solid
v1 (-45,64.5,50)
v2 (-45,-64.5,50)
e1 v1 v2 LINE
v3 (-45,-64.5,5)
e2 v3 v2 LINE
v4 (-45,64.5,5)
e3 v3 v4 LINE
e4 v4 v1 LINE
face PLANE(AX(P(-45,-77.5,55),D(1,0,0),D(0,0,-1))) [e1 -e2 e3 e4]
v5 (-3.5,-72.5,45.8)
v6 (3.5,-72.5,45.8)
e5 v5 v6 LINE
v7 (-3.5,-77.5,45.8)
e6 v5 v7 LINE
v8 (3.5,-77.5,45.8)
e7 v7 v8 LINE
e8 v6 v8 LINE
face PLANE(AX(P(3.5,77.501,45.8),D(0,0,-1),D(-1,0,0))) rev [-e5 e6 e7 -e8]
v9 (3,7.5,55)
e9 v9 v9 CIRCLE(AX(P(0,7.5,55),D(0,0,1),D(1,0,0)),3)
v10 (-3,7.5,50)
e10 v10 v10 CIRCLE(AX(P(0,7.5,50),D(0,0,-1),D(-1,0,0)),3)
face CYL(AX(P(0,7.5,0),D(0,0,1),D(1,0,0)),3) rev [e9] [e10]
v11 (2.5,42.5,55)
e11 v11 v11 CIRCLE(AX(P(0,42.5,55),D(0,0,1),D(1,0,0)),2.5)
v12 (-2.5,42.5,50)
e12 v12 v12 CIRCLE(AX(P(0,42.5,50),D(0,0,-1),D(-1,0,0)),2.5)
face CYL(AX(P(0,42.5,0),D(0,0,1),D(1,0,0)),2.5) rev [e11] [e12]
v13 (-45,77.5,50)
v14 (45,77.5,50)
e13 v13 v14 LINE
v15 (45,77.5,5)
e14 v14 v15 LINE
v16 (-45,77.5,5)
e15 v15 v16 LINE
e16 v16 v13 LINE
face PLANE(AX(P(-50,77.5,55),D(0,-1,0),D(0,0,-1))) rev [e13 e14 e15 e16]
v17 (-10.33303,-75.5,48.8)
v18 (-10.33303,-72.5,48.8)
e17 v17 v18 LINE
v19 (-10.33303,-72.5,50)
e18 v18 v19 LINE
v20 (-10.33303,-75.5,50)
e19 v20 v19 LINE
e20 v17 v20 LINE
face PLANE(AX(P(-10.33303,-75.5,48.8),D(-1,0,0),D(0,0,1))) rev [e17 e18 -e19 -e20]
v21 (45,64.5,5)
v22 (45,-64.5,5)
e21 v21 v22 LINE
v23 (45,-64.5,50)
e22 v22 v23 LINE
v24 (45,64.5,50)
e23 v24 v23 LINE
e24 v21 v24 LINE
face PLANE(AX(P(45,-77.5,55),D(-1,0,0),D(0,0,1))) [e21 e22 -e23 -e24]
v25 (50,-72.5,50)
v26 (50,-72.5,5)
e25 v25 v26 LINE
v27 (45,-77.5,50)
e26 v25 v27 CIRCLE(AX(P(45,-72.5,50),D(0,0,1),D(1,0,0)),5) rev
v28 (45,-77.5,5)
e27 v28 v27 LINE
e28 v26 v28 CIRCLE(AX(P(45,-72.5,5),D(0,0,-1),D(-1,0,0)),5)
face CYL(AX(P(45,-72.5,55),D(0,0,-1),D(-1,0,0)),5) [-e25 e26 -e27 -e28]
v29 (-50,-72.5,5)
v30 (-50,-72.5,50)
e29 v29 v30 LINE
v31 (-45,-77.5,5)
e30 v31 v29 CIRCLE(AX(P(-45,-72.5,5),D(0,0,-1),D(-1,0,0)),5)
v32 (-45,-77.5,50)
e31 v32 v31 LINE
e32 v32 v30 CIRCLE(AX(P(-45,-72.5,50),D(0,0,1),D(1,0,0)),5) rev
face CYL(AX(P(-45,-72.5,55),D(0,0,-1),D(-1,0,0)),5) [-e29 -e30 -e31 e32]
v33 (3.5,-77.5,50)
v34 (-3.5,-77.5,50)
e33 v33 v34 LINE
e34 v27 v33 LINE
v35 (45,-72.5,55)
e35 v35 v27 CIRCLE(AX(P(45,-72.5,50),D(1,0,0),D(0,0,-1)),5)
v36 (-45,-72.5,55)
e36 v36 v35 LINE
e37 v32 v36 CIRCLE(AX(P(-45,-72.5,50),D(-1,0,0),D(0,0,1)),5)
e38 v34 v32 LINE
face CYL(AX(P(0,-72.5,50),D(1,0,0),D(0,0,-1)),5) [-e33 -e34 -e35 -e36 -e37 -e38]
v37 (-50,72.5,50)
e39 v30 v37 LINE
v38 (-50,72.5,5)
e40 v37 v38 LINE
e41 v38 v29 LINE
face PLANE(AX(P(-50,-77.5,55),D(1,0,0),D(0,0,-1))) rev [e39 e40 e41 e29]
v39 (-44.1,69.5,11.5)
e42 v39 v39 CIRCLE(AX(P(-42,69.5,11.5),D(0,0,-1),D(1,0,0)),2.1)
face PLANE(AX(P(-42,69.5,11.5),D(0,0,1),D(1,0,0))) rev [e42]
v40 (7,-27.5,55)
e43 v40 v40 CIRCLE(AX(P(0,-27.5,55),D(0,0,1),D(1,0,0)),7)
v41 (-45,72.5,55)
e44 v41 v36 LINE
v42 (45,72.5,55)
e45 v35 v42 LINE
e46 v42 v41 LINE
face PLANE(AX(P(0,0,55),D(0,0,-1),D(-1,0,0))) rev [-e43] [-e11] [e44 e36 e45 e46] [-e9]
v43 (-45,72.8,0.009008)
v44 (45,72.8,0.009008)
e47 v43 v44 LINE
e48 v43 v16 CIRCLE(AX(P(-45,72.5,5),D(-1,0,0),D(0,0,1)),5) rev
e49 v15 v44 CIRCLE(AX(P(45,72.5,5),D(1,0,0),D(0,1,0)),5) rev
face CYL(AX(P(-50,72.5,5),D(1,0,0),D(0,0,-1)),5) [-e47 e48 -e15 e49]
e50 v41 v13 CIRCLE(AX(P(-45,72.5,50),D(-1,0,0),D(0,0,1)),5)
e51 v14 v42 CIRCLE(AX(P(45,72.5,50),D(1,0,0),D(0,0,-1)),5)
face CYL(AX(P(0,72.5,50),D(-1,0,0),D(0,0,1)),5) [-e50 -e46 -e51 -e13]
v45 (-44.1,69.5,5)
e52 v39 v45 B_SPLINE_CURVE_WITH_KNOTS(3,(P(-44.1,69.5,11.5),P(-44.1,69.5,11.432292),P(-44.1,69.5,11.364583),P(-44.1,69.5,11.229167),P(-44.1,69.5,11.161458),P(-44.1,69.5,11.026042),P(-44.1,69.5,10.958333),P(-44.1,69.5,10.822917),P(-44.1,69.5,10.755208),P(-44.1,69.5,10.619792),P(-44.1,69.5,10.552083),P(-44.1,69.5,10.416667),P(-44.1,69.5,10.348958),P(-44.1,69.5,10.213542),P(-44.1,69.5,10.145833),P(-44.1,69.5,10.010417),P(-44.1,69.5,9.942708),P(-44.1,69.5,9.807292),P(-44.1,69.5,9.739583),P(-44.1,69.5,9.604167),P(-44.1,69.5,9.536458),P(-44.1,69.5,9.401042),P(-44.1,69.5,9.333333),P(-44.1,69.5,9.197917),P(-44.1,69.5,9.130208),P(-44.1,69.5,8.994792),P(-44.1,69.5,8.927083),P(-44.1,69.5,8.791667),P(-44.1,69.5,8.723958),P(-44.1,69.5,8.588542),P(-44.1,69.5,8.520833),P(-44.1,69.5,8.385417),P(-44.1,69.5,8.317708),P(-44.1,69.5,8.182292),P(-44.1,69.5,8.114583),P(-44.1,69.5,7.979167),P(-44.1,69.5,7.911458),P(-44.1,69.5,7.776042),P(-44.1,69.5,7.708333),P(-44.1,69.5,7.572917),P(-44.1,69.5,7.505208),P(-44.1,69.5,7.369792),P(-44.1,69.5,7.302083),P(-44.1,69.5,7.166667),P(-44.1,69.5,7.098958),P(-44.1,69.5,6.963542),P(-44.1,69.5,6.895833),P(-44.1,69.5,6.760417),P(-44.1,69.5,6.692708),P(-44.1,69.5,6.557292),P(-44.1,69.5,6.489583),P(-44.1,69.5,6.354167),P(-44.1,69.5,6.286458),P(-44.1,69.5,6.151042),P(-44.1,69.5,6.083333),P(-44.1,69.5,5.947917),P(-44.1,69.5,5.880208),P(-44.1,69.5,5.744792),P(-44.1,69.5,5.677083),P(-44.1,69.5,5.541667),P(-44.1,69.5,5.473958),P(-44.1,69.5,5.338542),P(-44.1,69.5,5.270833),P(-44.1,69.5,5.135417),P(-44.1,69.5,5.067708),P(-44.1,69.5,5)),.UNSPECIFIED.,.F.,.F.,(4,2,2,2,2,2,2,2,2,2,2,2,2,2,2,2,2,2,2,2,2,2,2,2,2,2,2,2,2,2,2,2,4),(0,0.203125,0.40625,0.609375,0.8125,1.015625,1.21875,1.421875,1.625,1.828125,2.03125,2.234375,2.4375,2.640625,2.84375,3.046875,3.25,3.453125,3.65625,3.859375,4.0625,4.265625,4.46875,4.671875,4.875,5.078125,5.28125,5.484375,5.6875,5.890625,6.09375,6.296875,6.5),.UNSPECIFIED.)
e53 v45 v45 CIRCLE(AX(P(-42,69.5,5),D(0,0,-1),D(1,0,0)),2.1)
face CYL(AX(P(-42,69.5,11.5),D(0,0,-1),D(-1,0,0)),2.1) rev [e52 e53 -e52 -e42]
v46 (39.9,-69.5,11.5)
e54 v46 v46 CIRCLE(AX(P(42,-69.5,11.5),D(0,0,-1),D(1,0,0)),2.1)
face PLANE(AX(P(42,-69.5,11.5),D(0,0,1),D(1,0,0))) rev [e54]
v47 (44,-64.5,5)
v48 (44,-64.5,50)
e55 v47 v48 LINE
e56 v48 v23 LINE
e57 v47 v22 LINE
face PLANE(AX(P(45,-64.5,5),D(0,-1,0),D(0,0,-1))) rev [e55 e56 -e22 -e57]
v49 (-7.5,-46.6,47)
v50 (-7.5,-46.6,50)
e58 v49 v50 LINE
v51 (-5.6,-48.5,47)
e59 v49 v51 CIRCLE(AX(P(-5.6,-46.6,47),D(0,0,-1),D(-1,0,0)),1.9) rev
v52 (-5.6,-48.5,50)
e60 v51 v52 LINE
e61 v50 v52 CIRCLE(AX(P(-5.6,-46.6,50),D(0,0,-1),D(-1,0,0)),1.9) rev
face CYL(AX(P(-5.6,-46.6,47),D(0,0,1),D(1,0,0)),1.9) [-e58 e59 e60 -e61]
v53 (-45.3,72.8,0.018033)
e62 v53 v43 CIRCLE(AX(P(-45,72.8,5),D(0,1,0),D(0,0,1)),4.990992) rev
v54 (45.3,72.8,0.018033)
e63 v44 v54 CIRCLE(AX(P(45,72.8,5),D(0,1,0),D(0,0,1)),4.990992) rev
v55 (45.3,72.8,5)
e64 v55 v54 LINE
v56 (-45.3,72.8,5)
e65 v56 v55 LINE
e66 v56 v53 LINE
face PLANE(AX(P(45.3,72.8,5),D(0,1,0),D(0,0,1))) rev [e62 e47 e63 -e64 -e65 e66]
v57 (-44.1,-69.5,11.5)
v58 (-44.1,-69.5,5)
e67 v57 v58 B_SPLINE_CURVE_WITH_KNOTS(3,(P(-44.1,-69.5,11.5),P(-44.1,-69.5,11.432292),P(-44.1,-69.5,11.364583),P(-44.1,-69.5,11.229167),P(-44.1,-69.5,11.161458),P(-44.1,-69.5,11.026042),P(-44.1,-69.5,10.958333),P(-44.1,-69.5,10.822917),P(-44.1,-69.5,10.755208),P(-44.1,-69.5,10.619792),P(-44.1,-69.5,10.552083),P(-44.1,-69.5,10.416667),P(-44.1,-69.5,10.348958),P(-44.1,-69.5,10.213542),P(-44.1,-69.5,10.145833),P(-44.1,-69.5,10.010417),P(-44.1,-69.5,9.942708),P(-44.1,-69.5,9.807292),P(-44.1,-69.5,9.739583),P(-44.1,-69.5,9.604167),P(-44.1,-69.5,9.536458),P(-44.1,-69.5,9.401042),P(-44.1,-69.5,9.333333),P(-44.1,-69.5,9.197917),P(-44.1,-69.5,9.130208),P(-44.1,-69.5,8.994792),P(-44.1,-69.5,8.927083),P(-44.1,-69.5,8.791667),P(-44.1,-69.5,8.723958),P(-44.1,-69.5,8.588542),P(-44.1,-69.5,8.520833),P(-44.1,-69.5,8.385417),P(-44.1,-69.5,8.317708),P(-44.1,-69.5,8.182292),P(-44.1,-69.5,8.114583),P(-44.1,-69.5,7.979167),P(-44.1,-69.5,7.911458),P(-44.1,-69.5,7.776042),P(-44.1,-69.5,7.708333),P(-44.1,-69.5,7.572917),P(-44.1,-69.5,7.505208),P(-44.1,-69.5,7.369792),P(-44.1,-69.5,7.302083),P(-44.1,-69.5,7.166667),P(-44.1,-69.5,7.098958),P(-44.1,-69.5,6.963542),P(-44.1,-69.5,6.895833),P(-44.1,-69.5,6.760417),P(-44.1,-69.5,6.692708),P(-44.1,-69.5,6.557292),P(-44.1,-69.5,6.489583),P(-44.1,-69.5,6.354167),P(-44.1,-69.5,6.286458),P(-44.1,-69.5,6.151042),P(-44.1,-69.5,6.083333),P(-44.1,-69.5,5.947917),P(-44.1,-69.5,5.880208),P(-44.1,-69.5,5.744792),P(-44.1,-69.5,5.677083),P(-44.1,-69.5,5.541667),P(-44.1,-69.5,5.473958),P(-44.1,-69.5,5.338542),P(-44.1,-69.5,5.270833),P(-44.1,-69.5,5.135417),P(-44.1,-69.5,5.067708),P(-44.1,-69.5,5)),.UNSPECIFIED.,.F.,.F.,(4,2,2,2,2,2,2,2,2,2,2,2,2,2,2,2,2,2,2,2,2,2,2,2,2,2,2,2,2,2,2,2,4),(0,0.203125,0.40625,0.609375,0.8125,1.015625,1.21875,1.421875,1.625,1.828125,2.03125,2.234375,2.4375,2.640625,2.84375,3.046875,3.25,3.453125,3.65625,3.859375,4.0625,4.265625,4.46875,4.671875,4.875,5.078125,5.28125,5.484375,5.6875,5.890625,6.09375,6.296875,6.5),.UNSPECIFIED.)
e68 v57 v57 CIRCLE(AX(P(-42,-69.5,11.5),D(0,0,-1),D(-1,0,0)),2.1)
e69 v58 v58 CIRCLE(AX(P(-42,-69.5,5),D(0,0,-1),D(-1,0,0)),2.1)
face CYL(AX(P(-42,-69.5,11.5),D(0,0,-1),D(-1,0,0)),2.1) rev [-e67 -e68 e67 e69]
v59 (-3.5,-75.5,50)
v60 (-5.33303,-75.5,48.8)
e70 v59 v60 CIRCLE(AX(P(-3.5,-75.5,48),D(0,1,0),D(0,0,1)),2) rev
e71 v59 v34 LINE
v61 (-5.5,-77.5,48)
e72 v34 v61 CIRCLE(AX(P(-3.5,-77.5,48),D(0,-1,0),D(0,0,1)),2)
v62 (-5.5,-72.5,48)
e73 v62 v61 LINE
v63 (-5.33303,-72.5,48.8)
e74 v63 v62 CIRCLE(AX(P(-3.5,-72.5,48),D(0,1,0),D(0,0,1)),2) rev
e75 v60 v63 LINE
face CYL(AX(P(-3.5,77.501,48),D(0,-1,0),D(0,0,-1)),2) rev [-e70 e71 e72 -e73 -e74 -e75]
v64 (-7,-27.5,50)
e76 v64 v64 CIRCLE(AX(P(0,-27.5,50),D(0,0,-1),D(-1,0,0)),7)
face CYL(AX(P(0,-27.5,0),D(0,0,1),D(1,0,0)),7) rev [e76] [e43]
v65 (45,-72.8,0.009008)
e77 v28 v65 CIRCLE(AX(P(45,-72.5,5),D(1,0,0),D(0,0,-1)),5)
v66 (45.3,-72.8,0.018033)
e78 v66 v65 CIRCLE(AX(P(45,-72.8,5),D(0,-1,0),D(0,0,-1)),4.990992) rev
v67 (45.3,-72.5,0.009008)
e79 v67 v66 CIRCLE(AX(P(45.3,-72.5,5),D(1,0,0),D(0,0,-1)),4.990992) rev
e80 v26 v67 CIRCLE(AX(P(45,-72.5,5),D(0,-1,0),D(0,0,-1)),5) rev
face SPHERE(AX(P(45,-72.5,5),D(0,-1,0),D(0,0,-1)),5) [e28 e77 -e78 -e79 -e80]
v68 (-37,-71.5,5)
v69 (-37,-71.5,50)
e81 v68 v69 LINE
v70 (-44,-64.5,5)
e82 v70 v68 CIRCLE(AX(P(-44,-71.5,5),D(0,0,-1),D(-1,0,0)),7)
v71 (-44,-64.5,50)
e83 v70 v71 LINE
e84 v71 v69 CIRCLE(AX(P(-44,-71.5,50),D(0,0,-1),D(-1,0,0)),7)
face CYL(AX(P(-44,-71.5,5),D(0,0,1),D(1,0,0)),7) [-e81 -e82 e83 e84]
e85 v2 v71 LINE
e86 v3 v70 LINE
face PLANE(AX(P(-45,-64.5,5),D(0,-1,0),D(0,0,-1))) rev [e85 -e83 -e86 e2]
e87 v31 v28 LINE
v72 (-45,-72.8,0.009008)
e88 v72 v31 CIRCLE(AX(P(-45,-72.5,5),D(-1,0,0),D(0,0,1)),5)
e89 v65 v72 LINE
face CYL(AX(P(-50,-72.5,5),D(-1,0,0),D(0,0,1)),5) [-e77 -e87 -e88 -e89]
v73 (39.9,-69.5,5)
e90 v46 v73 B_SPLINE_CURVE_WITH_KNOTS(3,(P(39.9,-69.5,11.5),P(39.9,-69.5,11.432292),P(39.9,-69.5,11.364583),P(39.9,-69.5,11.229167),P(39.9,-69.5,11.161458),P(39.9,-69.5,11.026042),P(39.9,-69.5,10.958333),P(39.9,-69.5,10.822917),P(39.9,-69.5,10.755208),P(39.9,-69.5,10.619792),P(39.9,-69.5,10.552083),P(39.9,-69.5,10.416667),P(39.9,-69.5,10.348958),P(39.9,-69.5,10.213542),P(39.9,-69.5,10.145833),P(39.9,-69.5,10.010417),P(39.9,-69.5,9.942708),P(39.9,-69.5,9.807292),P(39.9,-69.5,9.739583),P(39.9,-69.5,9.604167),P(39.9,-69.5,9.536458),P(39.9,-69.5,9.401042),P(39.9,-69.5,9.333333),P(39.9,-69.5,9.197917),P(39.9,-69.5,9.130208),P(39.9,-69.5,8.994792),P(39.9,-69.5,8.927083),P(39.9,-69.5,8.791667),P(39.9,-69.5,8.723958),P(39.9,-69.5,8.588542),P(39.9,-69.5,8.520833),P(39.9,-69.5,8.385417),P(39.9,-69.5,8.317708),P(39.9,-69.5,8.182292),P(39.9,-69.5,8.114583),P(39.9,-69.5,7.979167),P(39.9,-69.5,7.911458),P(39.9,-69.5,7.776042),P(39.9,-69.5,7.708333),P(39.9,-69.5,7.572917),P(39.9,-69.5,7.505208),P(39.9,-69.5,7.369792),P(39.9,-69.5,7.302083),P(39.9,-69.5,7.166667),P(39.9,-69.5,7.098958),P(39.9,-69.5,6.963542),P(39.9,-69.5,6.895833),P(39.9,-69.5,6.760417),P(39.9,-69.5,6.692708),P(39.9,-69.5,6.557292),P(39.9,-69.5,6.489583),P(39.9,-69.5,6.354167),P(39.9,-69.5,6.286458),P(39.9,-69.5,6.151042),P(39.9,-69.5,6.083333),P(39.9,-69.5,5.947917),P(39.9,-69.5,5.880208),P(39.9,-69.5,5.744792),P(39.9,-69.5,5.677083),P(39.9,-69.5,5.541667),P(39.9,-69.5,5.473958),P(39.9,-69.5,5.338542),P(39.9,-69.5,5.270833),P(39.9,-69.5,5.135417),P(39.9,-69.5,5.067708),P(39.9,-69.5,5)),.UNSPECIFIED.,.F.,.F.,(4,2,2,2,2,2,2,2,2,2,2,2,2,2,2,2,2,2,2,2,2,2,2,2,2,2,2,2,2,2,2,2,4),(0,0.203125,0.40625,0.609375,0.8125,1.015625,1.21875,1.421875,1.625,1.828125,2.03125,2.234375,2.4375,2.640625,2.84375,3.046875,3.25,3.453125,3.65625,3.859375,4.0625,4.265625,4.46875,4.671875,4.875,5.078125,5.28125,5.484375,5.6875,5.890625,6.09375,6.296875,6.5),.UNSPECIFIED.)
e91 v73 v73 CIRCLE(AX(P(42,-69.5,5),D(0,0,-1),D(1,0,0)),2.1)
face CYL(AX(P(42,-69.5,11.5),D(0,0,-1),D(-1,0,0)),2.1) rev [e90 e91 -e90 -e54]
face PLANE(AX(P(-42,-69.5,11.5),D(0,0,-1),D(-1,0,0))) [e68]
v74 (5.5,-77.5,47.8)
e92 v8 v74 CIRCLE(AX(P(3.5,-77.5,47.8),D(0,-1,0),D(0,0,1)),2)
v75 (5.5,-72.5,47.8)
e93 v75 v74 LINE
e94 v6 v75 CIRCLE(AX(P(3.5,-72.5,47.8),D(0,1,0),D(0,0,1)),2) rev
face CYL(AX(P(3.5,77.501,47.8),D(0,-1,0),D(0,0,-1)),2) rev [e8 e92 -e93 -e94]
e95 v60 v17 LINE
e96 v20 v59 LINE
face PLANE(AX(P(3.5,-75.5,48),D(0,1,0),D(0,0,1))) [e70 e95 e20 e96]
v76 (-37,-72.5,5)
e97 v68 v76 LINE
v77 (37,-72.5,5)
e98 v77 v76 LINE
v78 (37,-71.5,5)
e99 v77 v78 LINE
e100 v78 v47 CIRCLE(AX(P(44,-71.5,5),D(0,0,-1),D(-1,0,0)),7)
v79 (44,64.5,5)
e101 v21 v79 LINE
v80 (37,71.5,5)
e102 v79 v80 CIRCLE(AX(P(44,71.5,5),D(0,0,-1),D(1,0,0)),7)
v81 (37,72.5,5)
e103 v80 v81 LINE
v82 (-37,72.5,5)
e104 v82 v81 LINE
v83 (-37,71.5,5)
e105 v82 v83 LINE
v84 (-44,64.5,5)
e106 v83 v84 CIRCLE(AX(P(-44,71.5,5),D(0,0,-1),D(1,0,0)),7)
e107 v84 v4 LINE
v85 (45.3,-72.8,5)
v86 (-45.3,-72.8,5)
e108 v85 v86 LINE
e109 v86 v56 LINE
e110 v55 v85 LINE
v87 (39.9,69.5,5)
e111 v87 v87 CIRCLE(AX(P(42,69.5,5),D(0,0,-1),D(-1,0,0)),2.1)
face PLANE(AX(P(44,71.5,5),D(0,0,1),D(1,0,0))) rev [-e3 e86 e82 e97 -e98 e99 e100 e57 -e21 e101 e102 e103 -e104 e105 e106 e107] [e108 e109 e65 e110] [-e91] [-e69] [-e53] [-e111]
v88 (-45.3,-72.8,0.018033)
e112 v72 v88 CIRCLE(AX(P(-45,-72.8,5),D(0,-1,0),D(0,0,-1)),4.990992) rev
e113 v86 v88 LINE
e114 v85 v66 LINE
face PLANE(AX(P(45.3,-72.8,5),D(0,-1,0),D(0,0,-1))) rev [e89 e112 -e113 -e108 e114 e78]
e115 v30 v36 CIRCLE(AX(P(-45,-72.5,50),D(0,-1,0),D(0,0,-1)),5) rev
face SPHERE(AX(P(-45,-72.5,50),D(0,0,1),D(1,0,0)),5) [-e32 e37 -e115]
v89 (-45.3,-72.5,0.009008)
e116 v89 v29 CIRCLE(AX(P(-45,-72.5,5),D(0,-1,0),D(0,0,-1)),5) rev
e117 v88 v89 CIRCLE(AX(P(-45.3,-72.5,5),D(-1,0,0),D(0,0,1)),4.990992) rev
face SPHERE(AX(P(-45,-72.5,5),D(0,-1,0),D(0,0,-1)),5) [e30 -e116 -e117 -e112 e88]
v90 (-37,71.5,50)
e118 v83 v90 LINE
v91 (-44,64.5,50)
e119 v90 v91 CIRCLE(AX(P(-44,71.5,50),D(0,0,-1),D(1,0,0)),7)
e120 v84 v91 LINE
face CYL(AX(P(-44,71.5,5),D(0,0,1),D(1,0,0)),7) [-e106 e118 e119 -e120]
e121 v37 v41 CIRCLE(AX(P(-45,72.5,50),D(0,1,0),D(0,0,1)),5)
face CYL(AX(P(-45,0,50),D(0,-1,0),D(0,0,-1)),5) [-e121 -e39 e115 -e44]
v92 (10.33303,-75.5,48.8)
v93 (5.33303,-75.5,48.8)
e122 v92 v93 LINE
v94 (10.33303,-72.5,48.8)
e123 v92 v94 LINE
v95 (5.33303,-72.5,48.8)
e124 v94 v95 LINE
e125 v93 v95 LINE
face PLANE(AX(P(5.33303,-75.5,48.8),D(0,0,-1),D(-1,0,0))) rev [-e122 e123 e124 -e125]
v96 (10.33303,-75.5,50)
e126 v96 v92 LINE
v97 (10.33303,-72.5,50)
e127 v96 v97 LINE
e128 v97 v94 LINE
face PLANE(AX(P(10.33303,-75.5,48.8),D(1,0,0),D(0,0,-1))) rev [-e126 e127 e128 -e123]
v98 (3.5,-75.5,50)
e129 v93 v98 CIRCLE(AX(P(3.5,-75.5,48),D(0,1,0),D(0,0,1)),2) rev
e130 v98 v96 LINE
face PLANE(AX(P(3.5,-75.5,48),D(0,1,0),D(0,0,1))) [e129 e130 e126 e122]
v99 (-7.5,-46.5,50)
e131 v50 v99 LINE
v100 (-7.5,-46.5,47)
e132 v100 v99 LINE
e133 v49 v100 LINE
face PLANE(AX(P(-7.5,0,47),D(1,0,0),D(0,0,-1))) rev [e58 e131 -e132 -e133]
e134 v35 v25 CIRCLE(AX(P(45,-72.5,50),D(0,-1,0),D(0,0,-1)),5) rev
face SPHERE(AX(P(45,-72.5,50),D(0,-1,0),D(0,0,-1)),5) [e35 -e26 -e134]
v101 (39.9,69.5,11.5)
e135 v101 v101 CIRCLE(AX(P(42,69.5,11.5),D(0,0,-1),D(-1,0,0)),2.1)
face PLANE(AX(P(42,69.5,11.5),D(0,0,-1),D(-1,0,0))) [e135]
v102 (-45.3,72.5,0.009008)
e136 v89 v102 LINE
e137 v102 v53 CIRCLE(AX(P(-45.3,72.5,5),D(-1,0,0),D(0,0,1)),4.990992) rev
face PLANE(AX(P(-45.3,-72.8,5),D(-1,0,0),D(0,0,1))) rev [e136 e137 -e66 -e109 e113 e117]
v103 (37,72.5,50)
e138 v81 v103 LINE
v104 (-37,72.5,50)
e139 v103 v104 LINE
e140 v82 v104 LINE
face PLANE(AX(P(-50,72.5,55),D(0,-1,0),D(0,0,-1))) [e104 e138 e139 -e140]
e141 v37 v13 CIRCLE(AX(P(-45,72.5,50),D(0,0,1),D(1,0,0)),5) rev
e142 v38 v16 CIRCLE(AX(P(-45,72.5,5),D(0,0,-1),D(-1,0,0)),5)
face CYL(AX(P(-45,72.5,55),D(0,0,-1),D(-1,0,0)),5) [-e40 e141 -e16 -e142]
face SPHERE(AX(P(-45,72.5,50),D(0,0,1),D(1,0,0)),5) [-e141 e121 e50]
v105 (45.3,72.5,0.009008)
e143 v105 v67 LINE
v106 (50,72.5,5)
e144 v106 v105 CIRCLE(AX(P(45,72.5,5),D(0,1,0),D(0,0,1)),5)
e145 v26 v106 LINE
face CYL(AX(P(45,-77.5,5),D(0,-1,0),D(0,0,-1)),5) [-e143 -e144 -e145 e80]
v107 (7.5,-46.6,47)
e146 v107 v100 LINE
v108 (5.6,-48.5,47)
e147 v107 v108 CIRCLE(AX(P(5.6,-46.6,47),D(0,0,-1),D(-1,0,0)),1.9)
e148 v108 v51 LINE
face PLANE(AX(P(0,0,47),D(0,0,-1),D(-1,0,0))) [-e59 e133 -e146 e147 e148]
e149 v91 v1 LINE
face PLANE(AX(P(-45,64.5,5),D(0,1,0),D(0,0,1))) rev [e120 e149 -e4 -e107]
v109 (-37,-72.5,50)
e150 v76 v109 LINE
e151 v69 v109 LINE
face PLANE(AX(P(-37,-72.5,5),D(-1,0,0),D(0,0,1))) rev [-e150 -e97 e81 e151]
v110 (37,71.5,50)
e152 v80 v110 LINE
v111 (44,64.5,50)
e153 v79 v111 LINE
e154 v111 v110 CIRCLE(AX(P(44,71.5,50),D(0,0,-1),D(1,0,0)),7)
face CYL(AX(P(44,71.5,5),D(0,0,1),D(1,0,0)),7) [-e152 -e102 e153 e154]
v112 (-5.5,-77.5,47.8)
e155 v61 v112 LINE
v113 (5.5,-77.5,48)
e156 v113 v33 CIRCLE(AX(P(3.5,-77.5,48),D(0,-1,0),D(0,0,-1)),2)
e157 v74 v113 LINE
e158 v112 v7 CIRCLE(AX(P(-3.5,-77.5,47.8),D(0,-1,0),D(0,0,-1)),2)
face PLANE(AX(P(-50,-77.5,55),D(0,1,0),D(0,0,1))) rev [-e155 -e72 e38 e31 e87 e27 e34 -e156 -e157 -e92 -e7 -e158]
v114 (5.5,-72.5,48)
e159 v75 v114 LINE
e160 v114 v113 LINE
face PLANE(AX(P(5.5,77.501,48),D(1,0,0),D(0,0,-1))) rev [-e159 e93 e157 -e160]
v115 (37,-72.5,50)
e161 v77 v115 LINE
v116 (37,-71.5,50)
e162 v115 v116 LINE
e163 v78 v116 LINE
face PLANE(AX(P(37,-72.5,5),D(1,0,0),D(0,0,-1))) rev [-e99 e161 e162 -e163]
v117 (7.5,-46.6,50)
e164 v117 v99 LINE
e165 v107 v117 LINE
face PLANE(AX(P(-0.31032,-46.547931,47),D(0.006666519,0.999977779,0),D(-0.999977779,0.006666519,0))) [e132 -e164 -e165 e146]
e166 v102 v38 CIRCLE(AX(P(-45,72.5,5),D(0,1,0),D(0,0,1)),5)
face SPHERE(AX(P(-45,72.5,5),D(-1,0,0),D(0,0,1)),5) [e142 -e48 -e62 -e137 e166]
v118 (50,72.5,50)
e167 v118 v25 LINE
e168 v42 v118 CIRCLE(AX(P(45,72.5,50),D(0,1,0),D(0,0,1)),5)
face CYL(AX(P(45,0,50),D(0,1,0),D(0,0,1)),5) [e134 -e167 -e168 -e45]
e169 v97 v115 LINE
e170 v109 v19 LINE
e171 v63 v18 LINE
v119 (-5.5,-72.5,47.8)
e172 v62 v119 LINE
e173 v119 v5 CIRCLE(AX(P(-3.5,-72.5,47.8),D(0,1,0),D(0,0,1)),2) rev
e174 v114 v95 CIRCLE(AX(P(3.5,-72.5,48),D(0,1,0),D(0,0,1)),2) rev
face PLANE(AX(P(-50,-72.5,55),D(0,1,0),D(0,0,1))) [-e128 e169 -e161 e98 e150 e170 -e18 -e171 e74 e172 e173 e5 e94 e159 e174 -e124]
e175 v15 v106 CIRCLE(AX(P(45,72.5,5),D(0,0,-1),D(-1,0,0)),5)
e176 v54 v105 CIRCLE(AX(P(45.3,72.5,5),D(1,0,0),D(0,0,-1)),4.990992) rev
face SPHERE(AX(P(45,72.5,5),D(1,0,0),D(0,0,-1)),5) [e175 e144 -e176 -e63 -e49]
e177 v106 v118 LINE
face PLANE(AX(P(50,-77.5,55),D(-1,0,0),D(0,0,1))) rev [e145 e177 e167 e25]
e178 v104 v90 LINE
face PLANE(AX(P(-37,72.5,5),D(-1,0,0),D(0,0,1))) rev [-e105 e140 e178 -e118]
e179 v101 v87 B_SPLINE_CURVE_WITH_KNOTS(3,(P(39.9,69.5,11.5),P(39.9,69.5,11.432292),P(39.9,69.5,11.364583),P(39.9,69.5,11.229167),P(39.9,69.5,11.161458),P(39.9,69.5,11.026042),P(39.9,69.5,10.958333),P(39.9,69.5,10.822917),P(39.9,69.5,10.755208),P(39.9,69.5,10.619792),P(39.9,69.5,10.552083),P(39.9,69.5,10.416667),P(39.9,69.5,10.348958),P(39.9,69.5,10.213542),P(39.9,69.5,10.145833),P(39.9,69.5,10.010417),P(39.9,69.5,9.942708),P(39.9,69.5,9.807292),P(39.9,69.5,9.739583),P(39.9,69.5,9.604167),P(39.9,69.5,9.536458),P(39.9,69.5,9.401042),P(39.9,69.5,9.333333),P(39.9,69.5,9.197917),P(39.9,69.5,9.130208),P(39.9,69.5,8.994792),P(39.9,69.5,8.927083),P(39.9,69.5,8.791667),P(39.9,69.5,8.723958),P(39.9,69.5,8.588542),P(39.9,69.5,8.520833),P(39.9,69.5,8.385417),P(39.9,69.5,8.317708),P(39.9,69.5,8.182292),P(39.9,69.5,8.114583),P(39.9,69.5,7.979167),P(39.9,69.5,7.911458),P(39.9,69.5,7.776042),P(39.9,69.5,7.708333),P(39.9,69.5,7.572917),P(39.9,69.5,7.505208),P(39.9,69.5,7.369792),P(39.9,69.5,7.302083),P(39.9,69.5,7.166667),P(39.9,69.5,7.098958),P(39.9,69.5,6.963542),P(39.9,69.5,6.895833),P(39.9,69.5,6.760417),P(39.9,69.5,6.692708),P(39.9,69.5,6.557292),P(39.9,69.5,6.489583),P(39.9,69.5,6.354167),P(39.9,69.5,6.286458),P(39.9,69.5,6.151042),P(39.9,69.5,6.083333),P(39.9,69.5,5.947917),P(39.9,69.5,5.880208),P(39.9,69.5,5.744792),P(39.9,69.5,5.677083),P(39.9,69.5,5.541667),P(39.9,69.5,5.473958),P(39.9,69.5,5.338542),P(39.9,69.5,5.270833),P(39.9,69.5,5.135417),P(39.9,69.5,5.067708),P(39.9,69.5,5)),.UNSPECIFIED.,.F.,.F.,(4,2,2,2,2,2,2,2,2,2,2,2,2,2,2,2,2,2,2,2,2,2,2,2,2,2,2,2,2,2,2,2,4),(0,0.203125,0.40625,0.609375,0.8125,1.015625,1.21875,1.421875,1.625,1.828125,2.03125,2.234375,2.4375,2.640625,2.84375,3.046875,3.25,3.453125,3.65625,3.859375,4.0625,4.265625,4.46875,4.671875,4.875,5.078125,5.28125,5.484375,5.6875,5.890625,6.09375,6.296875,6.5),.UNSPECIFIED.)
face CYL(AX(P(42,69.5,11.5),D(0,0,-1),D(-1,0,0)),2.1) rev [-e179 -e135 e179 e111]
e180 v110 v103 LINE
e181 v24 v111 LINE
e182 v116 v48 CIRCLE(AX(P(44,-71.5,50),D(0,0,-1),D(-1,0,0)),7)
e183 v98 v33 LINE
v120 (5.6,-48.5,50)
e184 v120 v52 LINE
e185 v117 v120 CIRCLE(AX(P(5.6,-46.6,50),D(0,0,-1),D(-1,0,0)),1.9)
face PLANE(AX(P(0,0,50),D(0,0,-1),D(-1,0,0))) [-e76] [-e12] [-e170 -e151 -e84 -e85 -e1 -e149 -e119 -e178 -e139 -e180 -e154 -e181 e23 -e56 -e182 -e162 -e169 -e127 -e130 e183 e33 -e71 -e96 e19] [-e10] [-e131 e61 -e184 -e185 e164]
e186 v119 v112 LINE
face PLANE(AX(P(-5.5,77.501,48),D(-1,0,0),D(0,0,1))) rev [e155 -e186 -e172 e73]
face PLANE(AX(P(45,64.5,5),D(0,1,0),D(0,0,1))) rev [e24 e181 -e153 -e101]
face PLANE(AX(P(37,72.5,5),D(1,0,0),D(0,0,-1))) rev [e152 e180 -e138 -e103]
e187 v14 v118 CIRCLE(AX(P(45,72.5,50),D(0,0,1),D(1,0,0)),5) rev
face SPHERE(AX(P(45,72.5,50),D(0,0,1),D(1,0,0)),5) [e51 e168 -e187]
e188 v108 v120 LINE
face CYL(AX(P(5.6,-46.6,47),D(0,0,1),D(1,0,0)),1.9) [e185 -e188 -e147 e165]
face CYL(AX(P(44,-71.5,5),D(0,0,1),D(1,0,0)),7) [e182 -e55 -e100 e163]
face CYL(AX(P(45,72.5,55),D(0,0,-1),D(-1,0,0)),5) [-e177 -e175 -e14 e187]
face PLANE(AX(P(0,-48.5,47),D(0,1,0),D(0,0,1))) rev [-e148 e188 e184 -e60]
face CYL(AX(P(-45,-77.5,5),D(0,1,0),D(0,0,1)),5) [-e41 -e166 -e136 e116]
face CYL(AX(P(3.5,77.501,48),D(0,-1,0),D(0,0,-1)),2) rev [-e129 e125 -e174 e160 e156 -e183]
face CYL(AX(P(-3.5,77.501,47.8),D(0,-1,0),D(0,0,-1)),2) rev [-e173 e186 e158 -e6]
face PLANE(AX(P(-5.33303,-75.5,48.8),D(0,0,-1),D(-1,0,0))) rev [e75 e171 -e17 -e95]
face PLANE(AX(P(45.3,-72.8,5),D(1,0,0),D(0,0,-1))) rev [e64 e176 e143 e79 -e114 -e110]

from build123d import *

# Parameters (mm, degrees)
SKETCH6_W           = 100
SKETCH6_H           = 155
BOSS_EXTRUDE5_DEPTH = 55
FILLET2_R           = 5
SHELL3_START        = -45
SHELL3_OUTLINE_W    = 145
SHELL3_OUTLINE_H    = 50
SHELL3_DEPTH        = 90
BOSS_EXTRUDE6_DEPTH = 45
SKETCH8_R           = 2.1
CUT_EXTRUDE1_DEPTH  = 6.5
SKETCH9_R           = 2.5
SKETCH9_R_2         = 3
SKETCH9_R_3         = 7
CUT_EXTRUDE2_DEPTH  = 108.383657975
CUT_EXTRUDE3_REACH  = 173.901
CUT_EXTRUDE4_START  = -3
CUT_EXTRUDE4_DEPTH  = 3
BOSS_EXTRUDE7_DEPTH = 3
SKETCH15_W          = 90.6
SKETCH15_H          = 145.6
CUT_EXTRUDE5_DEPTH  = 5


# Read off the part's stored shape, not the designer's step: Shell3
with BuildPart() as part:
    # Sketch6 → Boss-Extrude5 (new body)
    with BuildSketch(Plane.XY):
        Rectangle(SKETCH6_W, SKETCH6_H)
    extrude(amount=BOSS_EXTRUDE5_DEPTH)

    # Fillet2
    fillet2_edges = [part.edges().sort_by_distance(p)[0] for p in [
        (-50, 0, 55),
        (0, -77.5, 55),
        (50, 0, 55),
        (0, -77.5, 0),
        (-50, 0, 0),
        (0, 77.5, 0),
        (50, 0, 0),
        (50, -77.5, 27.5),
        (-50, -77.5, 27.5),
        (-50, 77.5, 27.5),
        (50, 77.5, 27.5),
        (0, 77.5, 55),
    ]]
    fillet(fillet2_edges, radius=FILLET2_R)

    # Shell3 outline → Shell3 (cut)
    with BuildSketch(Plane.YZ.offset(SHELL3_START)):
        with Locations((0, 25)):
            Rectangle(SHELL3_OUTLINE_W, SHELL3_OUTLINE_H)
    extrude(amount=SHELL3_DEPTH, mode=Mode.SUBTRACT)

    # Sketch7 → Boss-Extrude6 (add)
    with BuildSketch(Plane(origin=(0, 0, 50), x_dir=(-1, 0, 0), z_dir=(0, 0, -1))):
        with BuildLine():
            Line((-45, 72.5), (-37, 72.5))
            Line((-37, 72.5), (-37, 71.5))
            ThreePointArc((-37, 71.5), (-39.050252532, 66.550252532), (-44, 64.5))
            Line((-44, 64.5), (-45, 64.5))
            Line((-45, 64.5), (-45, 72.5))
        make_face()
        with BuildLine():
            Line((45, 72.5), (37, 72.5))
            Line((37, 72.5), (37, 71.5))
            ThreePointArc((37, 71.5), (39.050252532, 66.550252532), (44, 64.5))
            Line((44, 64.5), (45, 64.5))
            Line((45, 64.5), (45, 72.5))
        make_face()
        with BuildLine():
            Line((-45, -64.5), (-44, -64.5))
            ThreePointArc((-44, -64.5), (-39.050252532, -66.550252532), (-37, -71.5))
            Line((-37, -71.5), (-37, -72.5))
            Line((-37, -72.5), (-45, -72.5))
            Line((-45, -72.5), (-45, -64.5))
        make_face()
        with BuildLine():
            Line((45, -72.5), (45, -64.5))
            Line((45, -64.5), (44, -64.5))
            ThreePointArc((44, -64.5), (39.050252532, -66.550252532), (37, -71.5))
            Line((37, -71.5), (37, -72.5))
            Line((37, -72.5), (45, -72.5))
        make_face()
    extrude(amount=BOSS_EXTRUDE6_DEPTH)

    # Sketch8 → Cut-Extrude1 (cut)
    with BuildSketch(Plane(origin=(0, 0, 5), x_dir=(-1, 0, 0), z_dir=(0, 0, -1))):
        with Locations((-42, 69.5)):
            Circle(SKETCH8_R)
        with Locations((42, 69.5)):
            Circle(SKETCH8_R)
        with Locations((42, -69.5)):
            Circle(SKETCH8_R)
        with Locations((-42, -69.5)):
            Circle(SKETCH8_R)
    extrude(amount=-CUT_EXTRUDE1_DEPTH, mode=Mode.SUBTRACT)

    # Sketch9 → Cut-Extrude2 (cut, through all)
    with BuildSketch(Plane.XY.offset(55)):
        with Locations((0, 42.5)):
            Circle(SKETCH9_R)
        with Locations((0, 7.5)):
            Circle(SKETCH9_R_2)
        with Locations((0, -27.5)):
            Circle(SKETCH9_R_3)
    extrude(amount=-CUT_EXTRUDE2_DEPTH, mode=Mode.SUBTRACT)

    # Sketch10 → Cut-Extrude3 (cut, up to next)
    with BuildSketch(Plane.XZ.offset(77.5), mode=Mode.PRIVATE) as cut_extrude3_sk1:
        with BuildLine():
            Line((-3.5, 50), (3.5, 50))
            ThreePointArc((3.5, 50), (4.914213562, 49.414213562), (5.5, 48))
            Line((5.5, 48), (5.5, 47.8))
            ThreePointArc((5.5, 47.8), (4.914213562, 46.385786438), (3.5, 45.8))
            Line((3.5, 45.8), (-3.5, 45.8))
            ThreePointArc((-3.5, 45.8), (-4.914213562, 46.385786438), (-5.5, 47.8))
            Line((-5.5, 47.8), (-5.5, 48))
            ThreePointArc((-5.5, 48), (-4.914213562, 49.414213562), (-3.5, 50))
        make_face()
    cut_extrude3_tool1 = extrude(cut_extrude3_sk1.sketch, amount=-CUT_EXTRUDE3_REACH, mode=Mode.PRIVATE) & part.part
    add(cut_extrude3_tool1.solids().sort_by_distance((0, -77.5, 47.9))[0], mode=Mode.SUBTRACT)

    # Sketch13 → Cut-Extrude4 (cut)
    with BuildSketch(Plane(origin=(0, -72.5, 0), x_dir=(1, 0, 0), z_dir=(0, 1, 0)).offset(CUT_EXTRUDE4_START)):
        with BuildLine():
            Line((5.5, -47.8), (5.5, -48))
            ThreePointArc((5.5, -48), (5.457812626, -48.408619287), (5.333030278, -48.8))
            Line((5.333030278, -48.8), (10.333030278, -48.8))
            Line((10.333030278, -48.8), (10.333030278, -50))
            Line((10.333030278, -50), (3.5, -50))
            Line((3.5, -50), (-3.5, -50))
            Line((-3.5, -50), (-10.333030278, -50))
            Line((-10.333030278, -50), (-10.333030278, -48.8))
            Line((-10.333030278, -48.8), (-5.333030278, -48.8))
            ThreePointArc((-5.333030278, -48.8), (-5.457812626, -48.408619287), (-5.5, -48))
            Line((-5.5, -48), (-5.5, -47.8))
            ThreePointArc((-5.5, -47.8), (-4.914213562, -46.385786438), (-3.5, -45.8))
            Line((-3.5, -45.8), (3.5, -45.8))
            ThreePointArc((3.5, -45.8), (4.914213562, -46.385786438), (5.5, -47.8))
        make_face()
    extrude(amount=CUT_EXTRUDE4_DEPTH, mode=Mode.SUBTRACT)

    # Sketch14 → Boss-Extrude7 (add)
    with BuildSketch(Plane(origin=(0, 0, 50), x_dir=(-1, 0, 0), z_dir=(0, 0, -1))):
        with BuildLine():
            Line((-7.5, -46.6), (7.5, -46.5))
            Line((7.5, -46.5), (7.5, -46.6))
            ThreePointArc((7.5, -46.6), (6.943502884, -47.943502884), (5.6, -48.5))
            Line((5.6, -48.5), (-5.6, -48.5))
            ThreePointArc((-5.6, -48.5), (-6.943502884, -47.943502884), (-7.5, -46.6))
        make_face()
    extrude(amount=BOSS_EXTRUDE7_DEPTH)

    # Sketch15 → Cut-Extrude5 (cut)
    with BuildSketch(Plane(origin=(0, 0, 0), x_dir=(-1, 0, 0), z_dir=(0, 0, -1))):
        Rectangle(SKETCH15_W, SKETCH15_H)
    extrude(amount=-CUT_EXTRUDE5_DEPTH, mode=Mode.SUBTRACT)


solid = part.part
